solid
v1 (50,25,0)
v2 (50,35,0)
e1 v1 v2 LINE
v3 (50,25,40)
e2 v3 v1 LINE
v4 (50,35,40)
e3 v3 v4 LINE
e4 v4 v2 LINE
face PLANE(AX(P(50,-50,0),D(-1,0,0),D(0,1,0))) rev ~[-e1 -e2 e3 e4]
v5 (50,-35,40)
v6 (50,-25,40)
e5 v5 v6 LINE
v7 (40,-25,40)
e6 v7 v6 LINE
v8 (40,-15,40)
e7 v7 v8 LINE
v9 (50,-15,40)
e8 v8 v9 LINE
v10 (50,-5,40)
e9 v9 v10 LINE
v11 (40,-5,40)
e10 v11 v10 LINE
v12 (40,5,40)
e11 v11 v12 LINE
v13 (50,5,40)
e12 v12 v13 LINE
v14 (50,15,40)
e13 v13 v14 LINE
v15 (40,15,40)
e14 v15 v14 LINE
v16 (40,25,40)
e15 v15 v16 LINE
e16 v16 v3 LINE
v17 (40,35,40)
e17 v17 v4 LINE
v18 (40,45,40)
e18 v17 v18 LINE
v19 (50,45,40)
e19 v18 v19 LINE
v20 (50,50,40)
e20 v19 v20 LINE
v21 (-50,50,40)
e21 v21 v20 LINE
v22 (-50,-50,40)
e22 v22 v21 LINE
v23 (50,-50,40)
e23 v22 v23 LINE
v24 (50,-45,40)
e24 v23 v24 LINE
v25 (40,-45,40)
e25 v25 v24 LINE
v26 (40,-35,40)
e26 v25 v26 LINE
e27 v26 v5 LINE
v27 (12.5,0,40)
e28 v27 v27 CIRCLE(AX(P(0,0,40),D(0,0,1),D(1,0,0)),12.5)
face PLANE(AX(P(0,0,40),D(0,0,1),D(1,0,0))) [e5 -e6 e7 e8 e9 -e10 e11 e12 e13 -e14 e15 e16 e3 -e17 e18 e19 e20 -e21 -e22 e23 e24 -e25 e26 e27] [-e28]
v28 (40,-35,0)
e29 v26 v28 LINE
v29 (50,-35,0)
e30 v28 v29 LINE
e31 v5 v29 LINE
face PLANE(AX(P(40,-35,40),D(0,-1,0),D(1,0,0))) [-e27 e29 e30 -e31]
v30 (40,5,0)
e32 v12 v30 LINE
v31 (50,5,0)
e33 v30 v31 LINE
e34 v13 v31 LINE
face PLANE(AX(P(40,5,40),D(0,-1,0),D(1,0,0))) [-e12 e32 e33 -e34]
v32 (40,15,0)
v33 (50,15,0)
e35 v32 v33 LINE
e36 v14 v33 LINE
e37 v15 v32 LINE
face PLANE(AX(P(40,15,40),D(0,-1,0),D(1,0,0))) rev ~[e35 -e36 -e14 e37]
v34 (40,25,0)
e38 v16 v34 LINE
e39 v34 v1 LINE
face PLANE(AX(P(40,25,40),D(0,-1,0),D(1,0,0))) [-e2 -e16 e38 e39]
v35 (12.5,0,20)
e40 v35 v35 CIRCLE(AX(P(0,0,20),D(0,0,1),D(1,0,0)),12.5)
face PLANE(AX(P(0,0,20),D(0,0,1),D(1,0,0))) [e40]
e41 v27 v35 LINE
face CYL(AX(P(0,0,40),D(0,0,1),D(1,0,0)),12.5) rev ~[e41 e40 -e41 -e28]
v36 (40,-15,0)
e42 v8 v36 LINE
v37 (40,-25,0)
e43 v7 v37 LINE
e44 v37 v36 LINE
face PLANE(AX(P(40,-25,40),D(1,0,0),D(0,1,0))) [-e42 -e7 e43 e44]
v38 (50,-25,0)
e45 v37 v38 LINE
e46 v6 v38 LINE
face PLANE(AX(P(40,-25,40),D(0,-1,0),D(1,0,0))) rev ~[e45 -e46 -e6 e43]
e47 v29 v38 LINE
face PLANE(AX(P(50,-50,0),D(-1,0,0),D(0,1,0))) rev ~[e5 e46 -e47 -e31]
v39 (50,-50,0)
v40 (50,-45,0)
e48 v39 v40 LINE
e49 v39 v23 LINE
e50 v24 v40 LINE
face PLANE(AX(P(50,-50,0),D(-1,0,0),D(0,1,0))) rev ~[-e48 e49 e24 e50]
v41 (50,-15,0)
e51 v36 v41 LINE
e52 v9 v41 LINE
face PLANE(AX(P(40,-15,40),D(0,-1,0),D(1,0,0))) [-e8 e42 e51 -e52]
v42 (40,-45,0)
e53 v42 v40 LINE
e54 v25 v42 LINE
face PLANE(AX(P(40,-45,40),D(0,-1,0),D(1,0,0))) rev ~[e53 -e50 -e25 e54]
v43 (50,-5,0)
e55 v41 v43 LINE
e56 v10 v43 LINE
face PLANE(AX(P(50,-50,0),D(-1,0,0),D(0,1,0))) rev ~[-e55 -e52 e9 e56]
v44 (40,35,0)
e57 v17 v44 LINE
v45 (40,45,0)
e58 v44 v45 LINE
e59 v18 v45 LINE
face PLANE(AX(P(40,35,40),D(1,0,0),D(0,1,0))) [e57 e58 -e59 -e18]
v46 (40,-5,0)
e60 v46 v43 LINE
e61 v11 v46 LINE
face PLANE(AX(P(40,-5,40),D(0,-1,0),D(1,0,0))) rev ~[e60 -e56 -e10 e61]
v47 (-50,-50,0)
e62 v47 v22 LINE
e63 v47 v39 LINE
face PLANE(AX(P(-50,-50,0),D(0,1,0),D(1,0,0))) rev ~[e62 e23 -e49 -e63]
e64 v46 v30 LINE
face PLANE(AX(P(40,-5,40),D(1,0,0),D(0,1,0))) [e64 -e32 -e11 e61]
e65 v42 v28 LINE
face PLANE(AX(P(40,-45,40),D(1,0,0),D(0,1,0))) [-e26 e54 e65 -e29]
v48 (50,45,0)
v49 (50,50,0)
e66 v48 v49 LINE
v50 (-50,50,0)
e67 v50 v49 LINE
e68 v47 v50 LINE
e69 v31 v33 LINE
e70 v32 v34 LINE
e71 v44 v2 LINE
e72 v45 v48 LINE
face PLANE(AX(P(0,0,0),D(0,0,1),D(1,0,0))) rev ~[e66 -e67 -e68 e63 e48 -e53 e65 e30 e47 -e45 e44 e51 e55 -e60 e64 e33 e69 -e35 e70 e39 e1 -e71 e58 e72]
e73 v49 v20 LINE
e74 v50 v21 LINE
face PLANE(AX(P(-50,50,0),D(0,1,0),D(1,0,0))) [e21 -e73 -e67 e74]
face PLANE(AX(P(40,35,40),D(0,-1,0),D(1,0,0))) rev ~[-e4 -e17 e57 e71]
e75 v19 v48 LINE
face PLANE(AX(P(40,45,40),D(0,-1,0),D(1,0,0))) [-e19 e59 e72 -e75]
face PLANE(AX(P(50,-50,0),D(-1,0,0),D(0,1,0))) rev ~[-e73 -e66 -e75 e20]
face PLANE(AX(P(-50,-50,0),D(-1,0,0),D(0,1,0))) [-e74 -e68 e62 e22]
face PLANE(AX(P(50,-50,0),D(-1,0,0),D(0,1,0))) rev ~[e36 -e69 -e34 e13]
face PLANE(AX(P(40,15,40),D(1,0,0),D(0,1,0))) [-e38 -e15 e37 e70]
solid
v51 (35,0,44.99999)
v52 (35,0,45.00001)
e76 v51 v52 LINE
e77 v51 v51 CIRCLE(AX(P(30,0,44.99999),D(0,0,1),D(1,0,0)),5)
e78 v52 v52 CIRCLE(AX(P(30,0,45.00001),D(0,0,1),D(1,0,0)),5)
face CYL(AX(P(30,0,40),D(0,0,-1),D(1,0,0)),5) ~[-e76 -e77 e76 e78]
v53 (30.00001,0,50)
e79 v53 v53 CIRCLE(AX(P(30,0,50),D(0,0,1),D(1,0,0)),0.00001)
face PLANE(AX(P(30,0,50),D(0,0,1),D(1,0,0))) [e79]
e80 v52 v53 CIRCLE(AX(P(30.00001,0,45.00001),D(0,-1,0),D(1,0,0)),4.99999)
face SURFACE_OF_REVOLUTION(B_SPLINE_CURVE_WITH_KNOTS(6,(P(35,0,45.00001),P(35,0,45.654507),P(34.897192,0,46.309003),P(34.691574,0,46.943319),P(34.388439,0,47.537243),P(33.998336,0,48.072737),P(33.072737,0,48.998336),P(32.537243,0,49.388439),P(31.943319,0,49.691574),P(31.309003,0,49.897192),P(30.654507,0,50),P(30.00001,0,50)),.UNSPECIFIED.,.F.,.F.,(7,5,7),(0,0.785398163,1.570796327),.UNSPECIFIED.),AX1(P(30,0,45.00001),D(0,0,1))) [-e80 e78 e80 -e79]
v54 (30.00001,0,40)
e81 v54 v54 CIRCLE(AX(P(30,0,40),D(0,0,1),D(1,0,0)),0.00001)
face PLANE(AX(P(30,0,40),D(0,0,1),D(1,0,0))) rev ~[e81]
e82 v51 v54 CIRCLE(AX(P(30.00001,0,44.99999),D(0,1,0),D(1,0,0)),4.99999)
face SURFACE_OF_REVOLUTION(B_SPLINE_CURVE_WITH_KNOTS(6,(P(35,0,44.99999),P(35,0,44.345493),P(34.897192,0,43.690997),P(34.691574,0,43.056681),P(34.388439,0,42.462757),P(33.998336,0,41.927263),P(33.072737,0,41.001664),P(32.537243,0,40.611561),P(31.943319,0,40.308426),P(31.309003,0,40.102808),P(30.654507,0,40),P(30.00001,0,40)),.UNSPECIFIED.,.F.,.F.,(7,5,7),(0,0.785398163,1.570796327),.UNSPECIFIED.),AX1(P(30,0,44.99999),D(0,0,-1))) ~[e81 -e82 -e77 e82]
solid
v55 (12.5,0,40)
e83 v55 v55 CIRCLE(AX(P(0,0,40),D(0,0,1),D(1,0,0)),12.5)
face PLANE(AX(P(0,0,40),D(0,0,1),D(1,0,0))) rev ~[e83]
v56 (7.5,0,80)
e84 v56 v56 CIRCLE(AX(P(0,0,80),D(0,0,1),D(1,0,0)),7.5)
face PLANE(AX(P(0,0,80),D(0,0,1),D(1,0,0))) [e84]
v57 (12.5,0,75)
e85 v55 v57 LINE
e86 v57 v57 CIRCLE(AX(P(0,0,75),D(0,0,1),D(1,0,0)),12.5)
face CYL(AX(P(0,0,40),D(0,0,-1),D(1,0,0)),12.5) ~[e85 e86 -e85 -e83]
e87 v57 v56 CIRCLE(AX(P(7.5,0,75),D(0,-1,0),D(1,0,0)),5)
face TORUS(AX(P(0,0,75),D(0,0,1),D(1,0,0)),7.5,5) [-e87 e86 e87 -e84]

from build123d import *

# Parameters (mm, degrees)
F0_W      = 100
F0_H      = 100
F1_DEPTH  = 40
F3_R      = 12.5
F4_DEPTH  = 20
F5_DEPTH  = 40
F6_R      = 5
F7_W      = 10
F7_H      = 10
F8_DEPTH  = 40
F9_R      = 5
F10_DEPTH = 10
F11_R     = 4.99999


# Not quite as in the source:
# - a fillet or chamfer is up to 0.001 mm smaller than in the source, because OpenCascade refuses the exact size
# - a feature names something its author has since deleted; it is built from what else it names


with BuildPart() as f1:
    # F0 (on Top) → F1 (new body)
    with BuildSketch(Plane.XY):
        Rectangle(F0_W, F0_H)
    extrude(amount=F1_DEPTH)

    # F3 (on offset) → F4 (cut)
    with BuildSketch(Plane.XY.offset(40)):
        Circle(F3_R)
    extrude(amount=-F4_DEPTH, mode=Mode.SUBTRACT)

    # F7 (on face) → F8 (cut)
    with BuildSketch(Plane.XY.offset(40)):
        with Locations((45, 40)):
            Rectangle(F7_W, F7_H)
        with Locations((45, 20)):
            Rectangle(F7_W, F7_H)
        with Locations((45, 0)):
            Rectangle(F7_W, F7_H)
        with Locations((45, -20)):
            Rectangle(F7_W, F7_H)
        with Locations((45, -40)):
            Rectangle(F7_W, F7_H)
    extrude(amount=-F8_DEPTH, mode=Mode.SUBTRACT)


with BuildPart() as f5:
    # F3 (on offset) → F5 (new body)
    with BuildSketch(Plane.XY.offset(40)):
        Circle(F3_R)
    extrude(amount=F5_DEPTH)

    # F6
    f6_edges = [f5.edges().sort_by_distance(p)[0] for p in [
        (-12.5, 0, 80),
    ]]
    fillet(f6_edges, radius=F6_R)


with BuildPart() as f10:
    # F9 (on offset) → F10 (new body)
    with BuildSketch(Plane.XY.offset(40)):
        with Locations((30, 0)):
            Circle(F9_R)
    extrude(amount=F10_DEPTH)

    # F11 (radius 5 in the source; OpenCascade refuses exactly that, so slightly less here)
    f11_edges = [f10.edges().sort_by_distance(p)[0] for p in [
        (25, 0, 50),
        (35, 0, 45),
        (25, 0, 40),
    ]]
    fillet(f11_edges, radius=F11_R)


solid = Compound([f1.part, f5.part, f10.part])
